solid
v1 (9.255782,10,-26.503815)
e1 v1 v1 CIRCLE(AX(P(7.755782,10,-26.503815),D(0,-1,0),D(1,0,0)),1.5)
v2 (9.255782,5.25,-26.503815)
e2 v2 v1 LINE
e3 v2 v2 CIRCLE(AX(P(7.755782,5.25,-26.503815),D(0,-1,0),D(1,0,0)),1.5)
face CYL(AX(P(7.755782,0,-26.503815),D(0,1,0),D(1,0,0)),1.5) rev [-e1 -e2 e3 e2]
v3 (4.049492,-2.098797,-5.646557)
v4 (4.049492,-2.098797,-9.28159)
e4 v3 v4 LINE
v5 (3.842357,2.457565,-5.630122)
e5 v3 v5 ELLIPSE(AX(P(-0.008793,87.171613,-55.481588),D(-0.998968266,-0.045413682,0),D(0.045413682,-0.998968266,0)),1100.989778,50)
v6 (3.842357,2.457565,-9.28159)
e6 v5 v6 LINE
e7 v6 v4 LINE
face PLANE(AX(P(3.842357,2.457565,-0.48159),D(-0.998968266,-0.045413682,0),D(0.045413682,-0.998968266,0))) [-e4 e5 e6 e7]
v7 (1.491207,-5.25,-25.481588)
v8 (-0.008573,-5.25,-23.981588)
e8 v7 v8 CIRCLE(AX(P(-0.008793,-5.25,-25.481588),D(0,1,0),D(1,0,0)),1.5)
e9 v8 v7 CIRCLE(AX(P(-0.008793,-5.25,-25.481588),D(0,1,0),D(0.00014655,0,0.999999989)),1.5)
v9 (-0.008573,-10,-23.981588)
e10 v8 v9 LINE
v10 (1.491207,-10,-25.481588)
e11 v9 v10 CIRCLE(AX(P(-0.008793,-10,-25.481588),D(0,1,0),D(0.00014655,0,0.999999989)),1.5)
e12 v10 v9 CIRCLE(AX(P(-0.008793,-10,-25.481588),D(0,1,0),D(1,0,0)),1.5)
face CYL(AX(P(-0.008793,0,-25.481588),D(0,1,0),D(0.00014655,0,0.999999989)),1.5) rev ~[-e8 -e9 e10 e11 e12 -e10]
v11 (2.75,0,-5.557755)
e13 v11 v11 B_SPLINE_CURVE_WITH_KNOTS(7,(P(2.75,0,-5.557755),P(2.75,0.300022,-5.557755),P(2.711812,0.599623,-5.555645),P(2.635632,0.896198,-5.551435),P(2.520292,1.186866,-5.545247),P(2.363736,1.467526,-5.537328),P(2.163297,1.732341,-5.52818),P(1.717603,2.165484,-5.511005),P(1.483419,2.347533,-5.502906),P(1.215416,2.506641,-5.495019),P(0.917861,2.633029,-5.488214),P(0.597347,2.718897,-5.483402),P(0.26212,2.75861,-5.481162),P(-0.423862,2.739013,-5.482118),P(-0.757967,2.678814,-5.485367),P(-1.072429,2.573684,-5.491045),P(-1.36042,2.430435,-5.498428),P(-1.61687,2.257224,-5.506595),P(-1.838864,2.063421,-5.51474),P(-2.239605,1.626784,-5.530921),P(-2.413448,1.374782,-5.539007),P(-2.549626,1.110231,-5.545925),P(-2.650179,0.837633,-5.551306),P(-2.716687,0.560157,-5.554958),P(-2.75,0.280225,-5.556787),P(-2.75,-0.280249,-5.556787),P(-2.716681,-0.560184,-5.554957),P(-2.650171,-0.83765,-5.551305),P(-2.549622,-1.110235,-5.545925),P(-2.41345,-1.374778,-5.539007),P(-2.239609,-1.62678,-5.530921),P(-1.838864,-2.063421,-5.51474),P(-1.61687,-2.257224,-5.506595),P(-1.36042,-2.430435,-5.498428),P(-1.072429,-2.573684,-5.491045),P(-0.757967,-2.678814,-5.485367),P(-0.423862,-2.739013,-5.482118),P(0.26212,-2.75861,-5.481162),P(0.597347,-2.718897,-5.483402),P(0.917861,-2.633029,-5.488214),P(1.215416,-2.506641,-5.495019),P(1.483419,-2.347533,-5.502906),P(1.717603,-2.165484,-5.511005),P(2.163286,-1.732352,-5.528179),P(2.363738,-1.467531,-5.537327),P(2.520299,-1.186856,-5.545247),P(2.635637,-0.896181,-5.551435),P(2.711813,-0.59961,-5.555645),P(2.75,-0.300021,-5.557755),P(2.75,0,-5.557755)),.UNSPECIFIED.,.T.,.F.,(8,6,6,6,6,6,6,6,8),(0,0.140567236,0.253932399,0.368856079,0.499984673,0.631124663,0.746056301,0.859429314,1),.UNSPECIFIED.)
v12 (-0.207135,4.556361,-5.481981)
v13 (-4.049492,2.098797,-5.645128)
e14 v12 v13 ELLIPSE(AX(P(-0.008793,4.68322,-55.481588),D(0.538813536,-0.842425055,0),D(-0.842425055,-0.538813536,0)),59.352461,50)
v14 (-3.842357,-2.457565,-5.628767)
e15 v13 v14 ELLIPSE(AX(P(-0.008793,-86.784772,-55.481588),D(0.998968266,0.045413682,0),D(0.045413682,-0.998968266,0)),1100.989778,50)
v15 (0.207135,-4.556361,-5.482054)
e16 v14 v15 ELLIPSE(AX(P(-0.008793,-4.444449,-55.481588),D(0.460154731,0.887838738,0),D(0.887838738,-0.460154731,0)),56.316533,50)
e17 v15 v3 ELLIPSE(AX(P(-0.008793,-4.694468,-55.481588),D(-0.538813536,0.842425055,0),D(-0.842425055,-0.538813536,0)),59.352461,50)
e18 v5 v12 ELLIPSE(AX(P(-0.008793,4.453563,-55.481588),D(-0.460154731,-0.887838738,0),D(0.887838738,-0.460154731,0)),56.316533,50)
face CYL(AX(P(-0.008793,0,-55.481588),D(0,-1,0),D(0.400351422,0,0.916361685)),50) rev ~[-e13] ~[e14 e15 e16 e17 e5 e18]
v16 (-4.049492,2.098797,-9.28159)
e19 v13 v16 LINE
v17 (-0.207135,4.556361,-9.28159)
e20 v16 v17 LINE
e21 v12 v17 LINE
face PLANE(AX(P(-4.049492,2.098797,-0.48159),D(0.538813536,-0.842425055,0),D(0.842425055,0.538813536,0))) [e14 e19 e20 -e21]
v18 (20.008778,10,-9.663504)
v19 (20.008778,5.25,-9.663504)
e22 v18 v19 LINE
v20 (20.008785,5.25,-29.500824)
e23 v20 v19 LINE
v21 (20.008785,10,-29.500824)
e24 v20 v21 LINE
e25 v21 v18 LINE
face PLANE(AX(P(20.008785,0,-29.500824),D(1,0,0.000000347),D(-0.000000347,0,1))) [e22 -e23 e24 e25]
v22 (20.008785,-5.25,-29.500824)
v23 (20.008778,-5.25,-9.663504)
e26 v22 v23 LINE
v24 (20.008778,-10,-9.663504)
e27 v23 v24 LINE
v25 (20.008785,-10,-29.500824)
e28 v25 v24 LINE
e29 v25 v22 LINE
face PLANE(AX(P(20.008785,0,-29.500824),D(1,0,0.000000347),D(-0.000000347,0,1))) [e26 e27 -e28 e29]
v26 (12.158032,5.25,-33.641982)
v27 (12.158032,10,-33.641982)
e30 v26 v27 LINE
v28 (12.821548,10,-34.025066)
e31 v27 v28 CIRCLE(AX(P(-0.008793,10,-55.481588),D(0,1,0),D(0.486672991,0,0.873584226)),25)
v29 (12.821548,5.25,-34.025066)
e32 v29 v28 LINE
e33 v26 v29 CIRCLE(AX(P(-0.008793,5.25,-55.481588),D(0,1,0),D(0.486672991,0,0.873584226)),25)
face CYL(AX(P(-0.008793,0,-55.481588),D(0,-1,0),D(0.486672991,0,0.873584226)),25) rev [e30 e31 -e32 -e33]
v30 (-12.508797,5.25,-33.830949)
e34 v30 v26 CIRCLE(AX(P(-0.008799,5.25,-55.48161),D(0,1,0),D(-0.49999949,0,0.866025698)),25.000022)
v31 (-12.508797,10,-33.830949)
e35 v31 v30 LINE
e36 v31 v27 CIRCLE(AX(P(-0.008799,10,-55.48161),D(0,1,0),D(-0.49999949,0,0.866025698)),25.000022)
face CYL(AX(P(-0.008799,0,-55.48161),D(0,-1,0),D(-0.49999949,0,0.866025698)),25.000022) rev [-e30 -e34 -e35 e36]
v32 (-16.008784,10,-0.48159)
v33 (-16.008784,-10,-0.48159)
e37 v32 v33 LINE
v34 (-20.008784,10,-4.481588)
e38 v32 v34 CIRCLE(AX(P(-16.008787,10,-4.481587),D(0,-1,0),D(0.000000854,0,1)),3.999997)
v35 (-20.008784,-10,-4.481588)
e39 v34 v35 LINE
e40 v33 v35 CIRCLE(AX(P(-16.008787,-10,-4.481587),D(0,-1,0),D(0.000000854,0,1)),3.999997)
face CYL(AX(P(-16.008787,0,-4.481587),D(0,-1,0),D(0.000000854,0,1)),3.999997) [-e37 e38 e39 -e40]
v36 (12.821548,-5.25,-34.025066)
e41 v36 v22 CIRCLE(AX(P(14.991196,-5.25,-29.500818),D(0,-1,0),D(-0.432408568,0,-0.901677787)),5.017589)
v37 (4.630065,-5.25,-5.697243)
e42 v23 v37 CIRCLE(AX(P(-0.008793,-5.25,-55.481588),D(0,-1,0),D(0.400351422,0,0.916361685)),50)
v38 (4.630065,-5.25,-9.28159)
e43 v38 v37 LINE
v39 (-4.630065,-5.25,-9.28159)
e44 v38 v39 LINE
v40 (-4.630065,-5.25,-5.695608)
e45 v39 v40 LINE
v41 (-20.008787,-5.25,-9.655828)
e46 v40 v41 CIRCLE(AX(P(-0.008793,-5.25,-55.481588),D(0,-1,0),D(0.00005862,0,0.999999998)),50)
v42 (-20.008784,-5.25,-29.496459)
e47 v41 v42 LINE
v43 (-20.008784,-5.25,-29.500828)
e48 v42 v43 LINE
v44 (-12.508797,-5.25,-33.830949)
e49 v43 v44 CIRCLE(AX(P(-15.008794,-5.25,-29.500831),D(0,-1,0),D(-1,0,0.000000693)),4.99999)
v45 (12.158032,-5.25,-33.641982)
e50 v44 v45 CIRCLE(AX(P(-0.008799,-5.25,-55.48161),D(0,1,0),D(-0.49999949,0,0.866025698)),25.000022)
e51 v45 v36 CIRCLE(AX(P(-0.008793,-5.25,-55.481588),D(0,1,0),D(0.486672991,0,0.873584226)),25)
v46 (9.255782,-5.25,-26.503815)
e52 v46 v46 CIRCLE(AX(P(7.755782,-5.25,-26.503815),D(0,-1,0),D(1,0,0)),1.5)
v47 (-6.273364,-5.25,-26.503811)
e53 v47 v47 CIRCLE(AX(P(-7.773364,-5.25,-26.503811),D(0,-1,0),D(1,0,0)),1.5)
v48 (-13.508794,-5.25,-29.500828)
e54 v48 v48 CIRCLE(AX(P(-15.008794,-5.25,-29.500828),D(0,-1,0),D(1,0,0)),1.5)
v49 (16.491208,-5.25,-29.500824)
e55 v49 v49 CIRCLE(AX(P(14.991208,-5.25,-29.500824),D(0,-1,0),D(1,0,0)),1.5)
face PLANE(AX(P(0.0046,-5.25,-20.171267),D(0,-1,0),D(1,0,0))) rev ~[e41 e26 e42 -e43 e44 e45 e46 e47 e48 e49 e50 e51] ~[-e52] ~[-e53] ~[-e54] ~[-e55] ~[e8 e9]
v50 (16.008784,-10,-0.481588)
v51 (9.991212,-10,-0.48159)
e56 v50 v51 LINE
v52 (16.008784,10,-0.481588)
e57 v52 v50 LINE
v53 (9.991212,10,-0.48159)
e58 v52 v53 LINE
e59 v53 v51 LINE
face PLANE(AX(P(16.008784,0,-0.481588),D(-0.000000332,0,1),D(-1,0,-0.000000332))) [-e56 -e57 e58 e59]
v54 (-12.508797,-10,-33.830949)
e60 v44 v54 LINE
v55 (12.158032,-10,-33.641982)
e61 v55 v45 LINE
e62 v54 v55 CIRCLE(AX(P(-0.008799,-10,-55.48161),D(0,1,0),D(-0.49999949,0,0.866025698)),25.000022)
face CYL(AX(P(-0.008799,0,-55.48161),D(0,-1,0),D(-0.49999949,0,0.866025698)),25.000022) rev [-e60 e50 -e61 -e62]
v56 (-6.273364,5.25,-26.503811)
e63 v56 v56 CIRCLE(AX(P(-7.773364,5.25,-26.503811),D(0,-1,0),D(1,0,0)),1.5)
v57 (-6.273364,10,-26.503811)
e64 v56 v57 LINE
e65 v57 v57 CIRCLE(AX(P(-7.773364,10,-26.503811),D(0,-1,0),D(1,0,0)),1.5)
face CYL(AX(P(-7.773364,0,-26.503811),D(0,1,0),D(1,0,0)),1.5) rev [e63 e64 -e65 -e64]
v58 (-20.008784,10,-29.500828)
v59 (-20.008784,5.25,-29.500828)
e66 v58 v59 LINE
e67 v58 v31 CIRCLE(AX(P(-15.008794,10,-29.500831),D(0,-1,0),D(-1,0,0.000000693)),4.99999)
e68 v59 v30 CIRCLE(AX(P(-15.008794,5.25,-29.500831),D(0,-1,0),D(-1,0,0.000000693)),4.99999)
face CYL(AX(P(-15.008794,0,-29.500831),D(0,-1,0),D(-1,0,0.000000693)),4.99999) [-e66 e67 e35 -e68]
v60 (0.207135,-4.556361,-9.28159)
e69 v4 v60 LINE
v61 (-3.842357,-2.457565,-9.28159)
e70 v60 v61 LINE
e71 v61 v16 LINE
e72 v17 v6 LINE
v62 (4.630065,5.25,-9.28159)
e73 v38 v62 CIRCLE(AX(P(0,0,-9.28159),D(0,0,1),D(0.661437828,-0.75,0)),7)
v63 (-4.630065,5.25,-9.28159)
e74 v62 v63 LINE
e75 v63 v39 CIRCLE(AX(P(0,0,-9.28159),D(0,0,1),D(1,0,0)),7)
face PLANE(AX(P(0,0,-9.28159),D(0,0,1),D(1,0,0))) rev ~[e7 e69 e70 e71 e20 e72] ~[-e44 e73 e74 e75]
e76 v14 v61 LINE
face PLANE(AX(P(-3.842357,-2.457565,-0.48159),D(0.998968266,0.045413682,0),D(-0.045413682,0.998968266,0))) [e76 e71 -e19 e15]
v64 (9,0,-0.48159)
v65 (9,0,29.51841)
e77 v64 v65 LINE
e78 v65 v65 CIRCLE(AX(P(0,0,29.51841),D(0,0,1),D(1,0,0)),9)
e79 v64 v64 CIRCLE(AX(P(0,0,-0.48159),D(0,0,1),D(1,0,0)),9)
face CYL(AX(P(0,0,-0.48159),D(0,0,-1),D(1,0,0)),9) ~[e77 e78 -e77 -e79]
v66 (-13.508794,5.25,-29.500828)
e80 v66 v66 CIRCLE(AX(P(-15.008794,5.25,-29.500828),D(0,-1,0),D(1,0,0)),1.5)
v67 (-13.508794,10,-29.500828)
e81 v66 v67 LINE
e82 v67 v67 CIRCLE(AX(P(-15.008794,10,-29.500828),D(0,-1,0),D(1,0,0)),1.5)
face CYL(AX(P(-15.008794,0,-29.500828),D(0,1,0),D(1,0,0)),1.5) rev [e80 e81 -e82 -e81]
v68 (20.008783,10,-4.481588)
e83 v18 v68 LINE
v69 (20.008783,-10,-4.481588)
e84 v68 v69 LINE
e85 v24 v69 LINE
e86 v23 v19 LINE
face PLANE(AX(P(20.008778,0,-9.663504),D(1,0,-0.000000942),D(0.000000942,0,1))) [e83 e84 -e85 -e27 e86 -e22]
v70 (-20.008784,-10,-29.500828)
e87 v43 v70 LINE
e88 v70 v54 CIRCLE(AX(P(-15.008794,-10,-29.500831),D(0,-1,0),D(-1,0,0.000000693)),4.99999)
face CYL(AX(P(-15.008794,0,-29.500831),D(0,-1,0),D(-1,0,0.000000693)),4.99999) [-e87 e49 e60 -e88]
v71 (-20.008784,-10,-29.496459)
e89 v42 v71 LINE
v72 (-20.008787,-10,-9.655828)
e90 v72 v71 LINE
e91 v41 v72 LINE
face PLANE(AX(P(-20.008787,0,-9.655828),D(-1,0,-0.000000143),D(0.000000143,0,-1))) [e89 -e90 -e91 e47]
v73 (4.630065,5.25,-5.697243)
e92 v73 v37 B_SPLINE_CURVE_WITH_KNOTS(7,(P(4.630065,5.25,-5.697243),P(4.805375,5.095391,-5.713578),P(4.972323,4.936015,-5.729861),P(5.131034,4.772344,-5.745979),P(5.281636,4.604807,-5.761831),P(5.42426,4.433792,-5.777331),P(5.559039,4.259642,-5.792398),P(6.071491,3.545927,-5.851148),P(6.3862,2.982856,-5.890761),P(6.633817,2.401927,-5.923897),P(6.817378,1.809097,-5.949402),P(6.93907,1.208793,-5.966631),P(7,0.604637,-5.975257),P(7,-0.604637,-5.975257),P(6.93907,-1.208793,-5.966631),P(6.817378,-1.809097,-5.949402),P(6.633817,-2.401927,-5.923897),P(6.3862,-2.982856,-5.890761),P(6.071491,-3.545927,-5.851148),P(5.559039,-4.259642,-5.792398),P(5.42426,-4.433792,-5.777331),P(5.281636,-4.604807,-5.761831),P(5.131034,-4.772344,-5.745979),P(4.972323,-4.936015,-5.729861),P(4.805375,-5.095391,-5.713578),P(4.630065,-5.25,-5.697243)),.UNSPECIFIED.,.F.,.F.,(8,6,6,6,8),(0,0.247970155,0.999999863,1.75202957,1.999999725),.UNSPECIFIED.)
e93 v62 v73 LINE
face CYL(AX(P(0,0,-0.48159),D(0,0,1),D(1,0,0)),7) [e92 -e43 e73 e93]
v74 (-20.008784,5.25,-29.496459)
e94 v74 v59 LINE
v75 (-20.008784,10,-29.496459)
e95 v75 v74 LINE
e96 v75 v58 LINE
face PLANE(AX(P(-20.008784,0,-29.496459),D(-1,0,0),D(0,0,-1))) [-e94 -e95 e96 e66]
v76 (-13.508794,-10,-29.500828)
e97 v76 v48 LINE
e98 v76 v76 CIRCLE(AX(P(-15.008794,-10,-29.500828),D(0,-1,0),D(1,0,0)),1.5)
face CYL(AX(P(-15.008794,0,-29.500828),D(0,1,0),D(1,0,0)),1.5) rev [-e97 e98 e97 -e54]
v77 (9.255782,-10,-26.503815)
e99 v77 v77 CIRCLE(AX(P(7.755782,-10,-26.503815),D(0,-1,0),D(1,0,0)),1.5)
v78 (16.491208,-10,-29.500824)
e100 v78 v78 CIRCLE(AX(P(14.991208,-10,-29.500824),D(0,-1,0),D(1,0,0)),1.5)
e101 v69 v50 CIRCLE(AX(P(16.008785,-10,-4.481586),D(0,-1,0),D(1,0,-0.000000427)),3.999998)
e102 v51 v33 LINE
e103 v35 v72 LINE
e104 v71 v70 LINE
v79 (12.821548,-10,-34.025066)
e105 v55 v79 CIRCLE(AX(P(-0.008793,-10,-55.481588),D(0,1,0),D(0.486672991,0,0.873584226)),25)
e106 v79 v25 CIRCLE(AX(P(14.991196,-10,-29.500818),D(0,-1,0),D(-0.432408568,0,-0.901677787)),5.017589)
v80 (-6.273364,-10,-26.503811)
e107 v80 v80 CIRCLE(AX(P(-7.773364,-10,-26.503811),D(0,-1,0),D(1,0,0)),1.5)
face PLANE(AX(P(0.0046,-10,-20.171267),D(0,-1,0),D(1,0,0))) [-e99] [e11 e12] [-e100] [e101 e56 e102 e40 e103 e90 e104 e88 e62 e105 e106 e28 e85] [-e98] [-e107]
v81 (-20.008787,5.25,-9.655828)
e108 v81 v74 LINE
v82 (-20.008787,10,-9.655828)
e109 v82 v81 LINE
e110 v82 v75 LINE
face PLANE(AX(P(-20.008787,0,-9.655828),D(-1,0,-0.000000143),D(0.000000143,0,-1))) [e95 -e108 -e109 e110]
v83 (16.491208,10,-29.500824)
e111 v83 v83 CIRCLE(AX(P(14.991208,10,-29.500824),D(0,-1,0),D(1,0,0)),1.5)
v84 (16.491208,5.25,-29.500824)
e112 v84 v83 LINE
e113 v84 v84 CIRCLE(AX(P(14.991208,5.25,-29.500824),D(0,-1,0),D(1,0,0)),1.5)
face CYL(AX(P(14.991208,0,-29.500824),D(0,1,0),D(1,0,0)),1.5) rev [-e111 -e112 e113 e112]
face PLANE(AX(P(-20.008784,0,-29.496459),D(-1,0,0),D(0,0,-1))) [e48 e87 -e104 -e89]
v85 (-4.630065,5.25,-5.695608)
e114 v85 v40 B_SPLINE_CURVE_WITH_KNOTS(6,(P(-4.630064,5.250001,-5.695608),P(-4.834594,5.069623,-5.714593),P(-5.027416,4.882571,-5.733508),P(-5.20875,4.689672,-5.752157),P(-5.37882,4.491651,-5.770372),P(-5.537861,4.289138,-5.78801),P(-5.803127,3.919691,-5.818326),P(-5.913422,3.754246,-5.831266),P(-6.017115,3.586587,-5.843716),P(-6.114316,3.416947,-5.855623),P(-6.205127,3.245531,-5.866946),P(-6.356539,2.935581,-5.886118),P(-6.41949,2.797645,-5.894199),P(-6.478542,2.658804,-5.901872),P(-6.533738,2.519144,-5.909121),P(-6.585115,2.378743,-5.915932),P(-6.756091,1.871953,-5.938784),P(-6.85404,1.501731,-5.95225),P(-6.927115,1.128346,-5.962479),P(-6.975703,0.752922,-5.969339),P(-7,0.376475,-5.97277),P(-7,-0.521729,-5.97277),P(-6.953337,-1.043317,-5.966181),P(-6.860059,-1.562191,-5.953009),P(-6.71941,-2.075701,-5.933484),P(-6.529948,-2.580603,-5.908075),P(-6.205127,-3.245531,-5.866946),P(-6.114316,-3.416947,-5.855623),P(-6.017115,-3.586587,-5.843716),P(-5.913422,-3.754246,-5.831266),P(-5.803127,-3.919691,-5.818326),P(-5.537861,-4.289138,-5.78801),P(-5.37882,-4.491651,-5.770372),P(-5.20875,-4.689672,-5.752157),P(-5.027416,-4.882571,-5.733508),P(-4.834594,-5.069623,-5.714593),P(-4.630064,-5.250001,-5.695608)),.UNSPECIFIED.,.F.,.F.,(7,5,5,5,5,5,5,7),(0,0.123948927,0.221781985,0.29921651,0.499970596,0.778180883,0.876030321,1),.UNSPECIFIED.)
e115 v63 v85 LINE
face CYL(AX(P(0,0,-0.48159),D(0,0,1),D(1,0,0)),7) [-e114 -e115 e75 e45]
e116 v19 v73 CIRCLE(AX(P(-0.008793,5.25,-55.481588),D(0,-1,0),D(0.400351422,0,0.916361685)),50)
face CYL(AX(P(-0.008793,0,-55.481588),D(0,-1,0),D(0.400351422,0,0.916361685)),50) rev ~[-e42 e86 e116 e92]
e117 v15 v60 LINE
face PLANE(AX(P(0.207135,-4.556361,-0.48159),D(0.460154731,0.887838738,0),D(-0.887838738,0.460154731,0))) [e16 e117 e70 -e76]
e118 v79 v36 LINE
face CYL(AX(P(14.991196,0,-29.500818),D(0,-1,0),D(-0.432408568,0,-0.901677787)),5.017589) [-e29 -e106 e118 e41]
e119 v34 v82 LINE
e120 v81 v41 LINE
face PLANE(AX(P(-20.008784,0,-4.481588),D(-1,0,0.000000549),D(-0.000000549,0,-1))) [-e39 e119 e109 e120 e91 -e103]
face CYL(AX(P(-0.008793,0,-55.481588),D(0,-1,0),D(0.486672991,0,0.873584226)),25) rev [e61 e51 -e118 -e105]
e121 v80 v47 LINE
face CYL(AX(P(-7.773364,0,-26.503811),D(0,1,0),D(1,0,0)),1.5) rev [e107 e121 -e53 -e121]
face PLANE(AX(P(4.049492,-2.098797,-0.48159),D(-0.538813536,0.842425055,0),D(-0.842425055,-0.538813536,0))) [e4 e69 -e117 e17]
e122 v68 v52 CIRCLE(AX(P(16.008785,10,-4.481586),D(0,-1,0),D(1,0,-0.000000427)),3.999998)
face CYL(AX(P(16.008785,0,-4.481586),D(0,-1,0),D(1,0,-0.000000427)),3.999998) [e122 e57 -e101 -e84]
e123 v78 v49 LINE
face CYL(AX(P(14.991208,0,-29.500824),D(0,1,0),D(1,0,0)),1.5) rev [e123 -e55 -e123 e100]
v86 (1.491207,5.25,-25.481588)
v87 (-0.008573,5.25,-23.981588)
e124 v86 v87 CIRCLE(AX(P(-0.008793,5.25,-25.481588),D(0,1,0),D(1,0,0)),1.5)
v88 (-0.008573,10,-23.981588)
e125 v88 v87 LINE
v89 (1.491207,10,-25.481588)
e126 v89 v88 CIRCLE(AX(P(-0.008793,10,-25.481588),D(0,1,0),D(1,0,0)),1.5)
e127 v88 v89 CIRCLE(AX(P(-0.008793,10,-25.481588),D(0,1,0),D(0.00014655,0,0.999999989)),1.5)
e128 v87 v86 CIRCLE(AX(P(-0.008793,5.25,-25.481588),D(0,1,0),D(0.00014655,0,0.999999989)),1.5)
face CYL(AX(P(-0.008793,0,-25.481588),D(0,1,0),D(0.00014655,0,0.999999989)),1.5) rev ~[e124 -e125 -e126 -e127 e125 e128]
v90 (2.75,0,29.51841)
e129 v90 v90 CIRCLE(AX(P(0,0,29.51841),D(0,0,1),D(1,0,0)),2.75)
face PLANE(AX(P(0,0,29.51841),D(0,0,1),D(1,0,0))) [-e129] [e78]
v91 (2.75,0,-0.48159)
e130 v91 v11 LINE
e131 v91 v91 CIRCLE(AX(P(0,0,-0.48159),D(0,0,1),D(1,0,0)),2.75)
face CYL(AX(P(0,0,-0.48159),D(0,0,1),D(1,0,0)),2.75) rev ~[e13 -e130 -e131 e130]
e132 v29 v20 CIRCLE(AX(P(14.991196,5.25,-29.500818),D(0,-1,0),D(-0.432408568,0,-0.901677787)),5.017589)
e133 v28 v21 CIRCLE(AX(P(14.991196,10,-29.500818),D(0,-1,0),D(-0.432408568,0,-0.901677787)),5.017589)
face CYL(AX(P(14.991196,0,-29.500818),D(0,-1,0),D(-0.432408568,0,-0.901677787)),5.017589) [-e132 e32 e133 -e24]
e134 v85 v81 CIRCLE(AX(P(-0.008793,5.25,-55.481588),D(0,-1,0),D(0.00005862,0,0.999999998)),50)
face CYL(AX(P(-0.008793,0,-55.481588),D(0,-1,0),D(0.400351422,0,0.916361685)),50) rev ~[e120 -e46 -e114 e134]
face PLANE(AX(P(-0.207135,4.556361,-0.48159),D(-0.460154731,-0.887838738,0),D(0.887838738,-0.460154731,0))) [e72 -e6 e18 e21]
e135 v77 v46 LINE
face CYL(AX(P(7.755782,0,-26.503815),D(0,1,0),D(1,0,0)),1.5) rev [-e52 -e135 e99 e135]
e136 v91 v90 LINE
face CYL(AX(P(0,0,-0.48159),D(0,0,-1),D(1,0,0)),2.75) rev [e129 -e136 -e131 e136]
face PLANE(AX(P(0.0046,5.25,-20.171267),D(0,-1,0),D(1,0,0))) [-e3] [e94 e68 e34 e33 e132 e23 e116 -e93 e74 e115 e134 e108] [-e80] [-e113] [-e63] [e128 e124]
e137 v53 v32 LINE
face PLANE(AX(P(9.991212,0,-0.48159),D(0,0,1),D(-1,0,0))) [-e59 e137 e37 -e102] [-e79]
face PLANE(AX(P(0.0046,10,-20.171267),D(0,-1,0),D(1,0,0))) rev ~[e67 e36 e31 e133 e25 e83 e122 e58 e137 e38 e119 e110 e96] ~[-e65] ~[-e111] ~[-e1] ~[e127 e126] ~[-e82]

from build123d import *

# Parameters (mm, degrees)
F0_R     = 1.5
F1_DEPTH = 10
F2_DEPTH = 5.25
F3_R     = 9
F3_R_2   = 7
F3_R_3   = 2.75
F4_DEPTH = 30
F5_DEPTH = 8.8
F6_DEPTH = 5.0771655029


# Not quite as in the source:
# - ends of sketch curves that miss each other by under 0.0002 mm in the source are joined


with BuildPart() as f1:
    # F0 (on Front) → F1 (new body, symmetric)
    with BuildSketch(Plane.XZ):
        with BuildLine():
            ThreePointArc((20.0087781194, -9.6635037267), (10.2175079385, -6.5385316067), (-0.005862, -5.4815880859))
            ThreePointArc((-0.005862, -5.4815880859), (-10.2228373041, -6.5359722724), (-20.0087868417, -9.6558283627))
            Line((-20.0087868417, -9.6558283627), (-20.008784, -29.496459))
            Line((-20.008784, -29.496459), (-20.008784, -29.500828))
            ThreePointArc((-20.008784, -29.500828), (-17.5087901054, -33.8309491846), (-12.5087967107, -33.8309485011))
            ThreePointArc((-12.5087967107, -33.8309485011), (-0.2003110708, -30.4823215942), (12.1580317725, -33.6419823498))
            ThreePointArc((12.1580317725, -33.6419823498), (12.4912575647, -33.830982099), (12.8215481384, -34.0250657685))
            ThreePointArc((12.8215481384, -34.0250657685), (17.6641901361, -33.7471454023), (20.008785, -29.500824))
            Line((20.008785, -29.500824), (20.0087781194, -9.6635037267))
        make_face()
        with Locations((-15.008794, -29.500828)):
            Circle(F0_R, mode=Mode.SUBTRACT)
        with Locations((-7.773364, -26.503811)):
            Circle(F0_R, mode=Mode.SUBTRACT)
        with BuildLine():
            ThreePointArc((-0.008573175, -23.9815880161), (1.0519448888, -24.4210055509), (1.491207, -25.481588))
            ThreePointArc((1.491207, -25.481588), (-1.0695308888, -26.5421704491), (-0.008573175, -23.9815880161))
        make_face(mode=Mode.SUBTRACT)
        with Locations((7.755782, -26.503815)):
            Circle(F0_R, mode=Mode.SUBTRACT)
        with Locations((14.991208, -29.500824)):
            Circle(F0_R, mode=Mode.SUBTRACT)
        with BuildLine():
            Line((-0.0051292502, -0.48159), (-0.0058619999, -5.4815880859))
            ThreePointArc((-0.0058619999, -5.4815880859), (10.2175079385, -6.5385316067), (20.0087781194, -9.6635037267))
            Line((20.0087781194, -9.6635037267), (20.008783, -4.481588))
            ThreePointArc((20.008783, -4.481588), (18.8372111247, -1.6531608753), (16.008784, -0.481588))
            Line((16.008784, -0.481588), (9.991212, -0.48159))
            Line((9.991212, -0.48159), (-0.0051292502, -0.48159))
        make_face()
        with BuildLine():
            ThreePointArc((-20.0087868417, -9.6558283627), (-10.2228373041, -6.5359722724), (-0.005862, -5.4815880859))
            Line((-0.005862, -5.4815880859), (-0.0051292502, -0.48159))
            Line((-0.0051292502, -0.48159), (-10.008792, -0.48159))
            Line((-10.008792, -0.48159), (-16.008784, -0.48159))
            ThreePointArc((-16.008784, -0.48159), (-18.8372111247, -1.6531608753), (-20.008784, -4.481588))
            Line((-20.008784, -4.481588), (-20.0087868417, -9.6558283627))
        make_face()
    extrude(amount=F1_DEPTH, both=True)

    # F0 (on Front) → F2 (cut, symmetric)
    with BuildSketch(Plane.XZ):
        with BuildLine():
            ThreePointArc((20.0087781194, -9.6635037267), (10.2175079385, -6.5385316067), (-0.005862, -5.4815880859))
            ThreePointArc((-0.005862, -5.4815880859), (-10.2228373041, -6.5359722724), (-20.0087868417, -9.6558283627))
            Line((-20.0087868417, -9.6558283627), (-20.008784, -29.496459))
            Line((-20.008784, -29.496459), (-20.008784, -29.500828))
            ThreePointArc((-20.008784, -29.500828), (-17.5087901054, -33.8309491846), (-12.5087967107, -33.8309485011))
            ThreePointArc((-12.5087967107, -33.8309485011), (-0.2003110708, -30.4823215942), (12.1580317725, -33.6419823498))
            ThreePointArc((12.1580317725, -33.6419823498), (12.4912575647, -33.830982099), (12.8215481384, -34.0250657685))
            ThreePointArc((12.8215481384, -34.0250657685), (17.6641901361, -33.7471454023), (20.008785, -29.500824))
            Line((20.008785, -29.500824), (20.0087781194, -9.6635037267))
        make_face()
        with Locations((-15.008794, -29.500828)):
            Circle(F0_R, mode=Mode.SUBTRACT)
        with Locations((-7.773364, -26.503811)):
            Circle(F0_R, mode=Mode.SUBTRACT)
        with BuildLine():
            ThreePointArc((-0.008573175, -23.9815880161), (1.0519448888, -24.4210055509), (1.491207, -25.481588))
            ThreePointArc((1.491207, -25.481588), (-1.0695308888, -26.5421704491), (-0.008573175, -23.9815880161))
        make_face(mode=Mode.SUBTRACT)
        with Locations((7.755782, -26.503815)):
            Circle(F0_R, mode=Mode.SUBTRACT)
        with Locations((14.991208, -29.500824)):
            Circle(F0_R, mode=Mode.SUBTRACT)
    extrude(amount=F2_DEPTH, both=True, mode=Mode.SUBTRACT)

    # F3 (on face) → F4 (join)
    with BuildSketch(Plane.XY.offset(-0.48159)):
        Circle(F3_R)
        Circle(F3_R_2, mode=Mode.SUBTRACT)
        Circle(F3_R_2)
        Polygon((3.8423572259, 2.4575647055), (4.0494920794, -2.0987966153), (0.2071348534, -4.5563613208), (-3.8423572259, -2.4575647055), (-4.0494920794, 2.0987966153), (-0.2071348534, 4.5563613208), align=None, mode=Mode.SUBTRACT)
        Polygon((0.2071348534, -4.5563613208), (4.0494920794, -2.0987966153), (3.8423572259, 2.4575647055), (-0.2071348534, 4.5563613208), (-4.0494920794, 2.0987966153), (-3.8423572259, -2.4575647055), align=None)
        Circle(F3_R_3, mode=Mode.SUBTRACT)
    extrude(amount=F4_DEPTH)

    # F3 (on face) → F5 (join)
    with BuildSketch(Plane.XY.offset(-0.48159)):
        Circle(F3_R_2)
        Polygon((3.8423572259, 2.4575647055), (4.0494920794, -2.0987966153), (0.2071348534, -4.5563613208), (-3.8423572259, -2.4575647055), (-4.0494920794, 2.0987966153), (-0.2071348534, 4.5563613208), align=None, mode=Mode.SUBTRACT)
    extrude(amount=-F5_DEPTH)

    # F3 (on face) → F6 (cut, through all)
    with BuildSketch(Plane.XY.offset(-0.48159)):
        Circle(F3_R_3)
    extrude(amount=-F6_DEPTH, mode=Mode.SUBTRACT)


solid = f1.part
